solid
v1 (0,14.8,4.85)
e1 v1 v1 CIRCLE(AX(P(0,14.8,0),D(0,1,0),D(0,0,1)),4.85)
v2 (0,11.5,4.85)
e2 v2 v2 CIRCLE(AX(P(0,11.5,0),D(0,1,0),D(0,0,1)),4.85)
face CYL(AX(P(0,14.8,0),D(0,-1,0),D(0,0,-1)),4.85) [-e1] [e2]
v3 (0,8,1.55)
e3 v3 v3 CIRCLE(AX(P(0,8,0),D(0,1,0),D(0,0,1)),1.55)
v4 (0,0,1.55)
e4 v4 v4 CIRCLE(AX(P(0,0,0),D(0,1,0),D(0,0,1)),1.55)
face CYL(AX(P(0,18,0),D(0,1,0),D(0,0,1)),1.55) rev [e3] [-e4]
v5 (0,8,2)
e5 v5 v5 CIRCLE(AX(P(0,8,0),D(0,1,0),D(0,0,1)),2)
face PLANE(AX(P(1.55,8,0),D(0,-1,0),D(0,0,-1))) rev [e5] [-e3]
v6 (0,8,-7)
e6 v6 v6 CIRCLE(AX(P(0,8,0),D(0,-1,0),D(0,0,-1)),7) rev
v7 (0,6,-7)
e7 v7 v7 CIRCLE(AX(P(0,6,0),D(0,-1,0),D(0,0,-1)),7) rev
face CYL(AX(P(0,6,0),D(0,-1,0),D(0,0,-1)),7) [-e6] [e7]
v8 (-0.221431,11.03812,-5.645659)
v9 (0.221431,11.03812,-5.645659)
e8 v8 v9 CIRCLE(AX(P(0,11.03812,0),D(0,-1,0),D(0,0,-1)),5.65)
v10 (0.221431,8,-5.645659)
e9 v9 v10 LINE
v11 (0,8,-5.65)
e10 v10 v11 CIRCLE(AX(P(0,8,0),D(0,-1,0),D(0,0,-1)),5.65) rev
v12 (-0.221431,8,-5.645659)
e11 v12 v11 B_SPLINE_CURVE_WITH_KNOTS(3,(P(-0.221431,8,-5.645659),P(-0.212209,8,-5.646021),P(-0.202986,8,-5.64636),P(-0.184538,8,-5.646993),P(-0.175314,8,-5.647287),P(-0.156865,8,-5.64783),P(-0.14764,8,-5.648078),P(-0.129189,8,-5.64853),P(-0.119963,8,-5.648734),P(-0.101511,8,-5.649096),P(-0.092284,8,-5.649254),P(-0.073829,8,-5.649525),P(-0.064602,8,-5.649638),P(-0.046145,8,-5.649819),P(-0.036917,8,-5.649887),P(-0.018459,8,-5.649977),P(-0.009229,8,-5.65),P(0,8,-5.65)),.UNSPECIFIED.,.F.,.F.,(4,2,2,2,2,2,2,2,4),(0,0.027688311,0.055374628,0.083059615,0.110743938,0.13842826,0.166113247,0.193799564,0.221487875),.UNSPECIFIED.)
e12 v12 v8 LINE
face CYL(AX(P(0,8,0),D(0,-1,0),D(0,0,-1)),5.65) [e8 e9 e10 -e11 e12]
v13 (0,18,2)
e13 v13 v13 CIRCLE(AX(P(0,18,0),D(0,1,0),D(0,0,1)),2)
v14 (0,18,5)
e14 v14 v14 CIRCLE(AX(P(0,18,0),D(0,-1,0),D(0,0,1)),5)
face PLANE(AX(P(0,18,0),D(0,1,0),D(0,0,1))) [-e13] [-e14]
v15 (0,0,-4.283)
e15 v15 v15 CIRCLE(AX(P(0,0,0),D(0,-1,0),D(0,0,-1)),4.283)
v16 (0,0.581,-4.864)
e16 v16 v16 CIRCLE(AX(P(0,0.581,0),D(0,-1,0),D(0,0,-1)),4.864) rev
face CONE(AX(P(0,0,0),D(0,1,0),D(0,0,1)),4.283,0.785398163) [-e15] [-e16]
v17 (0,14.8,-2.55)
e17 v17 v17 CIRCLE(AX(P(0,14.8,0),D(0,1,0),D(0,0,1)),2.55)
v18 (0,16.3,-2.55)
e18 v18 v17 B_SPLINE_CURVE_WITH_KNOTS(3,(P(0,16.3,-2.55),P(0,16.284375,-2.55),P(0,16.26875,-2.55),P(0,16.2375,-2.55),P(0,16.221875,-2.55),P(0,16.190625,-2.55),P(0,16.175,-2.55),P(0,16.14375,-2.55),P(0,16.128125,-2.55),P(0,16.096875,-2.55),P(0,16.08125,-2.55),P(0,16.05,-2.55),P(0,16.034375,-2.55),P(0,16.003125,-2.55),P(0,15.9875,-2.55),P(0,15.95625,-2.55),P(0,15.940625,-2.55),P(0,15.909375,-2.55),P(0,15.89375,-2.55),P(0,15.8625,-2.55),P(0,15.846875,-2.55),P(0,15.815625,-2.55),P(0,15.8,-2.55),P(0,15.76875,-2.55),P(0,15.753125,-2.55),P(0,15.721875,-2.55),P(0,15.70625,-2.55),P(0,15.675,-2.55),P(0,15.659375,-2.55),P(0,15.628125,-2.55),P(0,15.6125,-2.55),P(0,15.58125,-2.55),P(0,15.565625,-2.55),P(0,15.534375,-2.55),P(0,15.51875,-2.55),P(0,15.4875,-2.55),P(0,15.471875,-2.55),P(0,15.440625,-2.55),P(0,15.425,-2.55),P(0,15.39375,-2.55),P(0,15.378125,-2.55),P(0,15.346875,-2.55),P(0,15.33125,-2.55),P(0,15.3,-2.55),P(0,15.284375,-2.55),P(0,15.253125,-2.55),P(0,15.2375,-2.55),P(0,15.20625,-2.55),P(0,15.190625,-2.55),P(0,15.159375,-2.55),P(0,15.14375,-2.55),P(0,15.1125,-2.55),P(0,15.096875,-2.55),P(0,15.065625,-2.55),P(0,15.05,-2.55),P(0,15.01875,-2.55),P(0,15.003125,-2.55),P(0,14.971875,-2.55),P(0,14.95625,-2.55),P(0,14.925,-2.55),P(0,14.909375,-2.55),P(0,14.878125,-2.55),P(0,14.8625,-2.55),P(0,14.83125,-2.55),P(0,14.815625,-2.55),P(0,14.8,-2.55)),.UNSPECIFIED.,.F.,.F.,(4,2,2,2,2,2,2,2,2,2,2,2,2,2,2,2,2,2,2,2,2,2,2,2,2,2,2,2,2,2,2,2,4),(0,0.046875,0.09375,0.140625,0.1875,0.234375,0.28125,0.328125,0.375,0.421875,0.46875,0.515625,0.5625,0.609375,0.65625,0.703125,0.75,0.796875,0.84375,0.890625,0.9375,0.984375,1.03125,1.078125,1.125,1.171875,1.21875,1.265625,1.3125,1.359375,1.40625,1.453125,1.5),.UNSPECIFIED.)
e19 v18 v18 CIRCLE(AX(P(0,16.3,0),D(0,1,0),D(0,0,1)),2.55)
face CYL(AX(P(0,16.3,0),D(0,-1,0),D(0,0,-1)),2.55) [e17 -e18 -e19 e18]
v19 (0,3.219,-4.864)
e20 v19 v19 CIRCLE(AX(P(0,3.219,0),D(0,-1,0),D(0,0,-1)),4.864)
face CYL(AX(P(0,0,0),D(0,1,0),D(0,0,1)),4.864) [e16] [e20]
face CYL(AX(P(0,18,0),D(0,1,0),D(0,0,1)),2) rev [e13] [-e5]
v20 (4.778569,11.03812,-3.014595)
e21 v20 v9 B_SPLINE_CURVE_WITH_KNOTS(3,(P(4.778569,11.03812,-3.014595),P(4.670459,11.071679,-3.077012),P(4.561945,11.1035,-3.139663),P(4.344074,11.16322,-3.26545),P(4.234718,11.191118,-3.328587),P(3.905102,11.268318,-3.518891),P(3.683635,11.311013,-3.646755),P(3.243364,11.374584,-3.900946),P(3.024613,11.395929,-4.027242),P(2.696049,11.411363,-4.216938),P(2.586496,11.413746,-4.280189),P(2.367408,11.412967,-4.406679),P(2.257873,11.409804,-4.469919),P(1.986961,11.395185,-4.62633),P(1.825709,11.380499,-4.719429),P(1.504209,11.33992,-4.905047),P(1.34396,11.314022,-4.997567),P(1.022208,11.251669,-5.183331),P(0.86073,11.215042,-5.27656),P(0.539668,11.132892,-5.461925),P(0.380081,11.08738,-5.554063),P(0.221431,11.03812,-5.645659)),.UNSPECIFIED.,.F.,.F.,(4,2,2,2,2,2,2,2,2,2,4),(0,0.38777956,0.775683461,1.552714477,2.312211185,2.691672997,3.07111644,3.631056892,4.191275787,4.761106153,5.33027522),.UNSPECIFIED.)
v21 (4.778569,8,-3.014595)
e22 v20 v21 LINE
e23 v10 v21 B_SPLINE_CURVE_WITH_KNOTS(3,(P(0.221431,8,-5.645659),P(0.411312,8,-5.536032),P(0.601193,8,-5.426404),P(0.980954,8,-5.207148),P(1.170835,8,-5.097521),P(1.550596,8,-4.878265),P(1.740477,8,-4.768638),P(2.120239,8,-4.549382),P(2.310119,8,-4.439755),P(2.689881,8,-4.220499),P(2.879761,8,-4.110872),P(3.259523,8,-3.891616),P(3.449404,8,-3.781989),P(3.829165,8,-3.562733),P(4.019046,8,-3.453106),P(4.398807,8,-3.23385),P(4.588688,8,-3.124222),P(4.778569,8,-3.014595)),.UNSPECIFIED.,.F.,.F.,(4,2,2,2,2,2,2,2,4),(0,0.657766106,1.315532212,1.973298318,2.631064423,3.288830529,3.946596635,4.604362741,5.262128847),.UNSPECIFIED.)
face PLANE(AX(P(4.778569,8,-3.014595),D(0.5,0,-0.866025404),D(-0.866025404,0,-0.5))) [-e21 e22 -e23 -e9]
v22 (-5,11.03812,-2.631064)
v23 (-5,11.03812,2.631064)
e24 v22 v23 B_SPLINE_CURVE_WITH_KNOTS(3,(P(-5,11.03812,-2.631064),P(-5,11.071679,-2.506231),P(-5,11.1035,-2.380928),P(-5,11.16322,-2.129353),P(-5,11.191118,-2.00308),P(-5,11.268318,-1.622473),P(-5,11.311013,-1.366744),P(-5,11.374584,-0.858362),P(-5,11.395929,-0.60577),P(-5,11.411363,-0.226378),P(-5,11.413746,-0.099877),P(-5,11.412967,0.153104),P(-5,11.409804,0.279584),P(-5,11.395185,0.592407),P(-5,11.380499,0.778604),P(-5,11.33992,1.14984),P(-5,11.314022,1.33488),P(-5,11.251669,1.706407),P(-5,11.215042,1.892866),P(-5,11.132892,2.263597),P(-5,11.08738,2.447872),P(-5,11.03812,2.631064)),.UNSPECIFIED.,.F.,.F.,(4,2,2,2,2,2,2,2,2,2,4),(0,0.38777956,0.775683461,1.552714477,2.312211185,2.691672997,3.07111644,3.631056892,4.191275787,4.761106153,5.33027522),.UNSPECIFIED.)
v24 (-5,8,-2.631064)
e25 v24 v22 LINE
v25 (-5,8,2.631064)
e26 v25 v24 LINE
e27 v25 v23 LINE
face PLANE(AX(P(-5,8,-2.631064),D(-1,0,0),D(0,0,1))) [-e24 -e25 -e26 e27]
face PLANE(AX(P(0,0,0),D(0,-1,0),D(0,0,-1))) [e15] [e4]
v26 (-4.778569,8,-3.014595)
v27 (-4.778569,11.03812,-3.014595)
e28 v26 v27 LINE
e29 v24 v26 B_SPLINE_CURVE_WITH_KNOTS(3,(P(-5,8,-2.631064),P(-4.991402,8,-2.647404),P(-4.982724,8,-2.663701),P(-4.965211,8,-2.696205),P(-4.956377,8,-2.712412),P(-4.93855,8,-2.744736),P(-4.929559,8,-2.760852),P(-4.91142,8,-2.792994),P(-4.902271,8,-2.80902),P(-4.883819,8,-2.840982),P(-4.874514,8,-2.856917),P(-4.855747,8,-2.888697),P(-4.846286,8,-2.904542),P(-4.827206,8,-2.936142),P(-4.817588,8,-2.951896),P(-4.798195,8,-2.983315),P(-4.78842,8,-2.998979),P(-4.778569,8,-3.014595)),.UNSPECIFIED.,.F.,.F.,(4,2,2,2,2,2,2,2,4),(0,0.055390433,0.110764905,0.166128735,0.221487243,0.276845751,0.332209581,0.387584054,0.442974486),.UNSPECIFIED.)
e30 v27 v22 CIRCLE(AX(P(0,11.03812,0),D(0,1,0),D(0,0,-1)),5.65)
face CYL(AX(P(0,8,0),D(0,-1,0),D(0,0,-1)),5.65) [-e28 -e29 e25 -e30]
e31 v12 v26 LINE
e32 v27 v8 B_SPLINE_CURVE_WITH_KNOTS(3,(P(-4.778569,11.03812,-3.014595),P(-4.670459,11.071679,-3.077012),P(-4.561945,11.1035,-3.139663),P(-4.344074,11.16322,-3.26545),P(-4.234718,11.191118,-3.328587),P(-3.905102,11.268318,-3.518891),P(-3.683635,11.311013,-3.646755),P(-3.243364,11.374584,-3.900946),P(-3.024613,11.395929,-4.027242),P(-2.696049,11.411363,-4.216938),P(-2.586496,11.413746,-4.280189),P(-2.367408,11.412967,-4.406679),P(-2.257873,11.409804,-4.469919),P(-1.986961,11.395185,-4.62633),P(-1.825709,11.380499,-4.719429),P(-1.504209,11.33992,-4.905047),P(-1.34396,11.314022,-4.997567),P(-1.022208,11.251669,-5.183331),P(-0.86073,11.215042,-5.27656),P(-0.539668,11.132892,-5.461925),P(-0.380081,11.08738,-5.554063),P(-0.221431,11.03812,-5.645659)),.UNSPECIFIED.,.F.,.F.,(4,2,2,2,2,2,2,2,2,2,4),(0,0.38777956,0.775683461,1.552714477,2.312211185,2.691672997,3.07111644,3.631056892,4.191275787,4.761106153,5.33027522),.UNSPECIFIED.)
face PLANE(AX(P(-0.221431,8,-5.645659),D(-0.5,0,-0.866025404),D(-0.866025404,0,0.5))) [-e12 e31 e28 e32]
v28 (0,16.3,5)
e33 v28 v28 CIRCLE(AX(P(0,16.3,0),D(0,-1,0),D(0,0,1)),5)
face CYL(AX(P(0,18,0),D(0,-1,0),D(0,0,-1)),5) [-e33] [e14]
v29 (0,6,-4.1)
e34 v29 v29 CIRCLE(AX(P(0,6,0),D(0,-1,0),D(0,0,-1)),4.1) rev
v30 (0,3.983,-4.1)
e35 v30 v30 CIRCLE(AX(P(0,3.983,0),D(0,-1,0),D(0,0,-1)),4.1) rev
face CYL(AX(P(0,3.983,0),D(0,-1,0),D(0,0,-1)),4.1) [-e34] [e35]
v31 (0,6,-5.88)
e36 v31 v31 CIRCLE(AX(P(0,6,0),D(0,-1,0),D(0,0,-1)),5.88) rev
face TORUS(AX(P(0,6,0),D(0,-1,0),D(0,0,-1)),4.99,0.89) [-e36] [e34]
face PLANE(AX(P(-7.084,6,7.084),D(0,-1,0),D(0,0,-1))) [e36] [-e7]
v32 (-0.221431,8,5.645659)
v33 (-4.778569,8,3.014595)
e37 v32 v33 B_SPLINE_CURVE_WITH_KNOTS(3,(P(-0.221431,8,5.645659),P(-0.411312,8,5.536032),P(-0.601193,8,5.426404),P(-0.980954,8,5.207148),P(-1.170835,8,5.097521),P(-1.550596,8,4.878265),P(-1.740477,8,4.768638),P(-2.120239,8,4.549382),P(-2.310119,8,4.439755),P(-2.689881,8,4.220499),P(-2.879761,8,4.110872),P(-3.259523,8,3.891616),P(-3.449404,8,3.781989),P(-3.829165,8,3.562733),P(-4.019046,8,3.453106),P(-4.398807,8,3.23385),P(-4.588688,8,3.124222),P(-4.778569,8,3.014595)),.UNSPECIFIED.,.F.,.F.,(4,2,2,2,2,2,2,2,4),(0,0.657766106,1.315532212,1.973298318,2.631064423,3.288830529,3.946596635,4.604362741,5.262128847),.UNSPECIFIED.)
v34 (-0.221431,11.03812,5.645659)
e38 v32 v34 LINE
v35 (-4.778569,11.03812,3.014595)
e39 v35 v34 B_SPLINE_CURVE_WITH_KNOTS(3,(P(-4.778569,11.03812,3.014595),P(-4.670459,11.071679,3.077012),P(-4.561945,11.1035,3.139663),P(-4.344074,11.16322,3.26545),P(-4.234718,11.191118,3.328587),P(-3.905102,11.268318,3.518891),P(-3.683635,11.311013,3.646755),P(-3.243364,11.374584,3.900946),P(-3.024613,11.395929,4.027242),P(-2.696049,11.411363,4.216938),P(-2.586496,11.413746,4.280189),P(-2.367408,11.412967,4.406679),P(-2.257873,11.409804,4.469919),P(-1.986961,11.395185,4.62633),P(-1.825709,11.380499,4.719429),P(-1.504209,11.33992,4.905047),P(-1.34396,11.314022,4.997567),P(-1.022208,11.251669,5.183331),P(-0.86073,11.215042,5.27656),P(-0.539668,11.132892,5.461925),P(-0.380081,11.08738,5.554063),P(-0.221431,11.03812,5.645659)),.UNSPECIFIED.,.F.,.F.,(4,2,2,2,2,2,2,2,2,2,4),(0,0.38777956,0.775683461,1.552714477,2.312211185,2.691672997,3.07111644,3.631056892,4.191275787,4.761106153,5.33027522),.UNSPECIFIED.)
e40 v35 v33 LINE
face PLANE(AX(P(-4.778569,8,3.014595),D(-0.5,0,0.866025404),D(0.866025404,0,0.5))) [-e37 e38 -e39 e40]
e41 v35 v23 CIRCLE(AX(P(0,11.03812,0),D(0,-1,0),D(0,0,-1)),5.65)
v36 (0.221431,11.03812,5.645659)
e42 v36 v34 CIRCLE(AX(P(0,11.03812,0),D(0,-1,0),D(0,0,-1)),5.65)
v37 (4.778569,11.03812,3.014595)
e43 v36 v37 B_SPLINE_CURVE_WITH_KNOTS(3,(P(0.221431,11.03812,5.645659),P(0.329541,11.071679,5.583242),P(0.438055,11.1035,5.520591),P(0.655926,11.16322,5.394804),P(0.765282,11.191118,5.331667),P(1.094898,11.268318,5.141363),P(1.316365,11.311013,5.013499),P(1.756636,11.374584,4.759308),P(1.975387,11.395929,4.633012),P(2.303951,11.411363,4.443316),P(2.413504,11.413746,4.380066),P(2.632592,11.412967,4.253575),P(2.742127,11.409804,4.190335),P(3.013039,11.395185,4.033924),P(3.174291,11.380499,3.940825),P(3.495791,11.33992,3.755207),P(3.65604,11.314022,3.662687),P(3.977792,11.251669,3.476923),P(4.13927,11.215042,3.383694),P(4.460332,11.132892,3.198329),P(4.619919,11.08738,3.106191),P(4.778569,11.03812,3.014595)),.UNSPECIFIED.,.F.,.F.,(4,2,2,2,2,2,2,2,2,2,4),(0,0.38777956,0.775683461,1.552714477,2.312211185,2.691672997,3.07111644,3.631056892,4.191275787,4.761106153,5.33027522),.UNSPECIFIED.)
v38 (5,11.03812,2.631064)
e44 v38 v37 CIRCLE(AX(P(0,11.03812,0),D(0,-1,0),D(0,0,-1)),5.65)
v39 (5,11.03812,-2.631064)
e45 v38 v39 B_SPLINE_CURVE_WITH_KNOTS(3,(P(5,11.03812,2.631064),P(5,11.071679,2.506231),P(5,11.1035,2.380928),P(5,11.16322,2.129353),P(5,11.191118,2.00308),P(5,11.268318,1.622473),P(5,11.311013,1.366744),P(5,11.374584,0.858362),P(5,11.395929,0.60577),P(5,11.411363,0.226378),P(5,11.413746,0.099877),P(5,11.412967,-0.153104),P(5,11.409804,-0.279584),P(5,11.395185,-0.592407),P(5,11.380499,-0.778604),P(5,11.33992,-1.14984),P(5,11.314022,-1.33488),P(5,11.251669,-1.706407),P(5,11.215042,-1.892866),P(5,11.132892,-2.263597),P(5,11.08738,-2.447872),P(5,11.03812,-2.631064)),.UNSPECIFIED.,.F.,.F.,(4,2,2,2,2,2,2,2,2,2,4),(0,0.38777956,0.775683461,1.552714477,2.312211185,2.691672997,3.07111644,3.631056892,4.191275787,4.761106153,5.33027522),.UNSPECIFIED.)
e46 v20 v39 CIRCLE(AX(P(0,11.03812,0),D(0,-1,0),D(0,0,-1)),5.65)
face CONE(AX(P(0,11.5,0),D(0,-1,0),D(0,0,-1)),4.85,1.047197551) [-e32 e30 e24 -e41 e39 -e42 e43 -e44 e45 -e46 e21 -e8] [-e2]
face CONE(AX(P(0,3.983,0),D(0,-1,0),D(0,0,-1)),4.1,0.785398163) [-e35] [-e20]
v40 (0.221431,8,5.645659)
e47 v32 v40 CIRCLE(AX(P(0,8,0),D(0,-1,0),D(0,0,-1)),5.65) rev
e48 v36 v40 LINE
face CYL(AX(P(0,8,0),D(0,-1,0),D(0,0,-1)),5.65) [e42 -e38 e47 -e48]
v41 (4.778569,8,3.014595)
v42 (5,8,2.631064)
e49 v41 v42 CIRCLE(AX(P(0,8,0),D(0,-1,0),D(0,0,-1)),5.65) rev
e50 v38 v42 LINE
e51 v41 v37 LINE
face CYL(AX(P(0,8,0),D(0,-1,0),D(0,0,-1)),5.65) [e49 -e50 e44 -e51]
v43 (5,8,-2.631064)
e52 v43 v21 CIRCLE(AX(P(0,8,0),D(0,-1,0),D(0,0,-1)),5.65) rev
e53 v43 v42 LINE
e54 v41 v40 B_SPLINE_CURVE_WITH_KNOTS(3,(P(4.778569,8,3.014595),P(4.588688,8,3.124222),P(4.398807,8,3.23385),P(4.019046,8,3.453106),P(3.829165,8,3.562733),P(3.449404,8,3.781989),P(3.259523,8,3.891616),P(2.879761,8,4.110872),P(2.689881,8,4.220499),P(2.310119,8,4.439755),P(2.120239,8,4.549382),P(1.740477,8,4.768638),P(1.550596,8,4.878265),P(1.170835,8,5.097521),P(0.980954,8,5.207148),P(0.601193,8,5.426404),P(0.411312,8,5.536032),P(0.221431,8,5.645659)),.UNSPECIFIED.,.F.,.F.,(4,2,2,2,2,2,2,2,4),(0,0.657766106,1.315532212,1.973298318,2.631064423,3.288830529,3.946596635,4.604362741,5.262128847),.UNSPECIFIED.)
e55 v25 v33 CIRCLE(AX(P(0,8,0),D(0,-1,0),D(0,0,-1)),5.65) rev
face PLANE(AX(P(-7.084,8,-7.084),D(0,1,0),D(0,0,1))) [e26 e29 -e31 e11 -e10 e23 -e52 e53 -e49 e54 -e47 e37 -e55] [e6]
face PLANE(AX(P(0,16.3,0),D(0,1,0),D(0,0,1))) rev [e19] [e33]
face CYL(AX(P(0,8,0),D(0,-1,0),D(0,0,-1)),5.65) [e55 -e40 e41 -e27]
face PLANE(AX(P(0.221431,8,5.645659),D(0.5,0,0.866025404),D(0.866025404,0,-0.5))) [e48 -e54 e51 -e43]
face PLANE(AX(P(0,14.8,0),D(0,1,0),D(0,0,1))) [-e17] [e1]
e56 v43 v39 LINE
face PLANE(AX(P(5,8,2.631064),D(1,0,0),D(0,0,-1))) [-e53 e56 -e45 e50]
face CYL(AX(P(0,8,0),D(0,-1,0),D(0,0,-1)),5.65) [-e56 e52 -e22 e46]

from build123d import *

# Parameters (mm, degrees)
ESTRUSIONE_ESTRUSIONE1_START                         = 8
ESTRUSIONE_ESTRUSIONE1_2_OUTLINE_R                   = 4.864
ESTRUSIONE_ESTRUSIONE1_2_DEPTH                       = 3.491917096
SCHIZZO2_R                                           = 4.85
ESTRUSIONE_ESTRUSIONE2_DEPTH                         = 3.3
SCHIZZO3_R                                           = 2.55
ESTRUSIONE_ESTRUSIONE3_DEPTH                         = 1.5
SCHIZZO4_R                                           = 5
ESTRUSIONE_ESTRUSIONE4_DEPTH                         = 1.7
FORO_LAMATO_PER_VITE_M2_5_A_TESTA_ESAGON_D           = 3.1
FORO_LAMATO_PER_VITE_M2_5_A_TESTA_ESAGON_CBORE_D     = 4
FORO_LAMATO_PER_VITE_M2_5_A_TESTA_ESAGON_CBORE_DEPTH = 10
SMUSSO1_SIZE                                         = 0.581


with BuildPart() as part:
    # Estrusione-Estrusione1: read off the stored shape, not the designer's step
    # Estrusione-Estrusione1 outline → Estrusione-Estrusione1 (revolve)
    with BuildSketch(Plane.XY):
        with BuildLine():
            Line((0, 0), (4.864, 0))
            Line((4.864, 0), (4.864, 3.219))
            Line((4.864, 3.219), (4.1, 3.983))
            Line((4.1, 3.983), (4.1, 6))
            ThreePointArc((4.1, 6), (4.99, 5.11), (5.88, 6))
            Line((5.88, 6), (7, 6))
            Line((7, 6), (7, 8))
            Line((7, 8), (4.864, 8))
            Line((4.864, 8), (4.864, 11.491917096))
            Line((4.864, 11.491917096), (4.85, 11.5))
            Line((4.85, 11.5), (0, 11.5))
            Line((0, 11.5), (0, 0))
        make_face()
    revolve(axis=Axis((0, 0, 0), (0, 1, 0)))

    # Estrusione-Estrusione1 2 outline → Estrusione-Estrusione1 2 (add)
    with BuildSketch(Plane(origin=(0, 0, 0), x_dir=(1, 0, 0), z_dir=(0, 1, 0)).offset(ESTRUSIONE_ESTRUSIONE1_START)):
        with BuildLine():
            ThreePointArc((4.77856863, -3.014594807), (4.893043531, -2.825), (5, -2.631064423))
            Line((5, -2.631064423), (5, 2.631064423))
            ThreePointArc((5, 2.631064423), (4.893043531, 2.825), (4.77856863, 3.014594807))
            Line((4.77856863, 3.014594807), (0.22143137, 5.645659231))
            ThreePointArc((0.22143137, 5.645659231), (0, 5.65), (-0.22143137, 5.645659231))
            Line((-0.22143137, 5.645659231), (-4.77856863, 3.014594807))
            ThreePointArc((-4.77856863, 3.014594807), (-4.893043531, 2.825), (-5, 2.631064423))
            Line((-5, 2.631064423), (-5, -2.631064423))
            ThreePointArc((-5, -2.631064423), (-4.893043531, -2.825), (-4.77856863, -3.014594807))
            Line((-4.77856863, -3.014594807), (-0.22143137, -5.645659231))
            ThreePointArc((-0.22143137, -5.645659231), (0, -5.65), (0.22143137, -5.645659231))
            Line((0.22143137, -5.645659231), (4.77856863, -3.014594807))
        make_face()
        Circle(ESTRUSIONE_ESTRUSIONE1_2_OUTLINE_R, mode=Mode.SUBTRACT)
    extrude(amount=ESTRUSIONE_ESTRUSIONE1_2_DEPTH)

    # Estrusione-Estrusione1 3 outline → Estrusione-Estrusione1 3 (revolve, cut)
    with BuildSketch(Plane.XY):
        Polygon((5.65, 11.491917096), (4.864, 11.491917096), (5.65, 11.038119785), align=None)
    revolve(axis=Axis((0, 0, 0), (0, 1, 0)), mode=Mode.SUBTRACT)

    # Schizzo2 → Estrusione-Estrusione2 (add)
    with BuildSketch(Plane(origin=(0, 11.5, 0), x_dir=(-1, 0, 0), z_dir=(0, 1, 0))):
        with Locations(Location((0, 0, 0), (0, 0, 90))):
            Circle(SCHIZZO2_R)
    extrude(amount=ESTRUSIONE_ESTRUSIONE2_DEPTH)

    # Schizzo3 → Estrusione-Estrusione3 (add)
    with BuildSketch(Plane(origin=(0, 14.8, 0), x_dir=(-1, 0, 0), z_dir=(0, 1, 0))):
        with Locations(Location((0, 0, 0), (0, 0, 270))):
            Circle(SCHIZZO3_R)
    extrude(amount=ESTRUSIONE_ESTRUSIONE3_DEPTH)

    # Schizzo4 → Estrusione-Estrusione4 (add)
    with BuildSketch(Plane.XZ.offset(-16.3)):
        with Locations(Location((0, 0, 0), (0, 0, 90))):
            Circle(SCHIZZO4_R)
    extrude(amount=-ESTRUSIONE_ESTRUSIONE4_DEPTH)

    # Foro lamato per Vite M2.5 a testa esagonale-1 (through all)
    with Locations(Plane(origin=(0, 18, 0), x_dir=(1, 0, 0), z_dir=(0, 1, 0))):
        with Locations((0, 0)):
            CounterBoreHole(FORO_LAMATO_PER_VITE_M2_5_A_TESTA_ESAGON_D / 2, FORO_LAMATO_PER_VITE_M2_5_A_TESTA_ESAGON_CBORE_D / 2, FORO_LAMATO_PER_VITE_M2_5_A_TESTA_ESAGON_CBORE_DEPTH)

    # Smusso1
    smusso1_edges = [part.edges().sort_by_distance(p)[0] for p in [
        (-4.864, 0, 0),
    ]]
    chamfer(smusso1_edges, length=SMUSSO1_SIZE)


solid = part.part
